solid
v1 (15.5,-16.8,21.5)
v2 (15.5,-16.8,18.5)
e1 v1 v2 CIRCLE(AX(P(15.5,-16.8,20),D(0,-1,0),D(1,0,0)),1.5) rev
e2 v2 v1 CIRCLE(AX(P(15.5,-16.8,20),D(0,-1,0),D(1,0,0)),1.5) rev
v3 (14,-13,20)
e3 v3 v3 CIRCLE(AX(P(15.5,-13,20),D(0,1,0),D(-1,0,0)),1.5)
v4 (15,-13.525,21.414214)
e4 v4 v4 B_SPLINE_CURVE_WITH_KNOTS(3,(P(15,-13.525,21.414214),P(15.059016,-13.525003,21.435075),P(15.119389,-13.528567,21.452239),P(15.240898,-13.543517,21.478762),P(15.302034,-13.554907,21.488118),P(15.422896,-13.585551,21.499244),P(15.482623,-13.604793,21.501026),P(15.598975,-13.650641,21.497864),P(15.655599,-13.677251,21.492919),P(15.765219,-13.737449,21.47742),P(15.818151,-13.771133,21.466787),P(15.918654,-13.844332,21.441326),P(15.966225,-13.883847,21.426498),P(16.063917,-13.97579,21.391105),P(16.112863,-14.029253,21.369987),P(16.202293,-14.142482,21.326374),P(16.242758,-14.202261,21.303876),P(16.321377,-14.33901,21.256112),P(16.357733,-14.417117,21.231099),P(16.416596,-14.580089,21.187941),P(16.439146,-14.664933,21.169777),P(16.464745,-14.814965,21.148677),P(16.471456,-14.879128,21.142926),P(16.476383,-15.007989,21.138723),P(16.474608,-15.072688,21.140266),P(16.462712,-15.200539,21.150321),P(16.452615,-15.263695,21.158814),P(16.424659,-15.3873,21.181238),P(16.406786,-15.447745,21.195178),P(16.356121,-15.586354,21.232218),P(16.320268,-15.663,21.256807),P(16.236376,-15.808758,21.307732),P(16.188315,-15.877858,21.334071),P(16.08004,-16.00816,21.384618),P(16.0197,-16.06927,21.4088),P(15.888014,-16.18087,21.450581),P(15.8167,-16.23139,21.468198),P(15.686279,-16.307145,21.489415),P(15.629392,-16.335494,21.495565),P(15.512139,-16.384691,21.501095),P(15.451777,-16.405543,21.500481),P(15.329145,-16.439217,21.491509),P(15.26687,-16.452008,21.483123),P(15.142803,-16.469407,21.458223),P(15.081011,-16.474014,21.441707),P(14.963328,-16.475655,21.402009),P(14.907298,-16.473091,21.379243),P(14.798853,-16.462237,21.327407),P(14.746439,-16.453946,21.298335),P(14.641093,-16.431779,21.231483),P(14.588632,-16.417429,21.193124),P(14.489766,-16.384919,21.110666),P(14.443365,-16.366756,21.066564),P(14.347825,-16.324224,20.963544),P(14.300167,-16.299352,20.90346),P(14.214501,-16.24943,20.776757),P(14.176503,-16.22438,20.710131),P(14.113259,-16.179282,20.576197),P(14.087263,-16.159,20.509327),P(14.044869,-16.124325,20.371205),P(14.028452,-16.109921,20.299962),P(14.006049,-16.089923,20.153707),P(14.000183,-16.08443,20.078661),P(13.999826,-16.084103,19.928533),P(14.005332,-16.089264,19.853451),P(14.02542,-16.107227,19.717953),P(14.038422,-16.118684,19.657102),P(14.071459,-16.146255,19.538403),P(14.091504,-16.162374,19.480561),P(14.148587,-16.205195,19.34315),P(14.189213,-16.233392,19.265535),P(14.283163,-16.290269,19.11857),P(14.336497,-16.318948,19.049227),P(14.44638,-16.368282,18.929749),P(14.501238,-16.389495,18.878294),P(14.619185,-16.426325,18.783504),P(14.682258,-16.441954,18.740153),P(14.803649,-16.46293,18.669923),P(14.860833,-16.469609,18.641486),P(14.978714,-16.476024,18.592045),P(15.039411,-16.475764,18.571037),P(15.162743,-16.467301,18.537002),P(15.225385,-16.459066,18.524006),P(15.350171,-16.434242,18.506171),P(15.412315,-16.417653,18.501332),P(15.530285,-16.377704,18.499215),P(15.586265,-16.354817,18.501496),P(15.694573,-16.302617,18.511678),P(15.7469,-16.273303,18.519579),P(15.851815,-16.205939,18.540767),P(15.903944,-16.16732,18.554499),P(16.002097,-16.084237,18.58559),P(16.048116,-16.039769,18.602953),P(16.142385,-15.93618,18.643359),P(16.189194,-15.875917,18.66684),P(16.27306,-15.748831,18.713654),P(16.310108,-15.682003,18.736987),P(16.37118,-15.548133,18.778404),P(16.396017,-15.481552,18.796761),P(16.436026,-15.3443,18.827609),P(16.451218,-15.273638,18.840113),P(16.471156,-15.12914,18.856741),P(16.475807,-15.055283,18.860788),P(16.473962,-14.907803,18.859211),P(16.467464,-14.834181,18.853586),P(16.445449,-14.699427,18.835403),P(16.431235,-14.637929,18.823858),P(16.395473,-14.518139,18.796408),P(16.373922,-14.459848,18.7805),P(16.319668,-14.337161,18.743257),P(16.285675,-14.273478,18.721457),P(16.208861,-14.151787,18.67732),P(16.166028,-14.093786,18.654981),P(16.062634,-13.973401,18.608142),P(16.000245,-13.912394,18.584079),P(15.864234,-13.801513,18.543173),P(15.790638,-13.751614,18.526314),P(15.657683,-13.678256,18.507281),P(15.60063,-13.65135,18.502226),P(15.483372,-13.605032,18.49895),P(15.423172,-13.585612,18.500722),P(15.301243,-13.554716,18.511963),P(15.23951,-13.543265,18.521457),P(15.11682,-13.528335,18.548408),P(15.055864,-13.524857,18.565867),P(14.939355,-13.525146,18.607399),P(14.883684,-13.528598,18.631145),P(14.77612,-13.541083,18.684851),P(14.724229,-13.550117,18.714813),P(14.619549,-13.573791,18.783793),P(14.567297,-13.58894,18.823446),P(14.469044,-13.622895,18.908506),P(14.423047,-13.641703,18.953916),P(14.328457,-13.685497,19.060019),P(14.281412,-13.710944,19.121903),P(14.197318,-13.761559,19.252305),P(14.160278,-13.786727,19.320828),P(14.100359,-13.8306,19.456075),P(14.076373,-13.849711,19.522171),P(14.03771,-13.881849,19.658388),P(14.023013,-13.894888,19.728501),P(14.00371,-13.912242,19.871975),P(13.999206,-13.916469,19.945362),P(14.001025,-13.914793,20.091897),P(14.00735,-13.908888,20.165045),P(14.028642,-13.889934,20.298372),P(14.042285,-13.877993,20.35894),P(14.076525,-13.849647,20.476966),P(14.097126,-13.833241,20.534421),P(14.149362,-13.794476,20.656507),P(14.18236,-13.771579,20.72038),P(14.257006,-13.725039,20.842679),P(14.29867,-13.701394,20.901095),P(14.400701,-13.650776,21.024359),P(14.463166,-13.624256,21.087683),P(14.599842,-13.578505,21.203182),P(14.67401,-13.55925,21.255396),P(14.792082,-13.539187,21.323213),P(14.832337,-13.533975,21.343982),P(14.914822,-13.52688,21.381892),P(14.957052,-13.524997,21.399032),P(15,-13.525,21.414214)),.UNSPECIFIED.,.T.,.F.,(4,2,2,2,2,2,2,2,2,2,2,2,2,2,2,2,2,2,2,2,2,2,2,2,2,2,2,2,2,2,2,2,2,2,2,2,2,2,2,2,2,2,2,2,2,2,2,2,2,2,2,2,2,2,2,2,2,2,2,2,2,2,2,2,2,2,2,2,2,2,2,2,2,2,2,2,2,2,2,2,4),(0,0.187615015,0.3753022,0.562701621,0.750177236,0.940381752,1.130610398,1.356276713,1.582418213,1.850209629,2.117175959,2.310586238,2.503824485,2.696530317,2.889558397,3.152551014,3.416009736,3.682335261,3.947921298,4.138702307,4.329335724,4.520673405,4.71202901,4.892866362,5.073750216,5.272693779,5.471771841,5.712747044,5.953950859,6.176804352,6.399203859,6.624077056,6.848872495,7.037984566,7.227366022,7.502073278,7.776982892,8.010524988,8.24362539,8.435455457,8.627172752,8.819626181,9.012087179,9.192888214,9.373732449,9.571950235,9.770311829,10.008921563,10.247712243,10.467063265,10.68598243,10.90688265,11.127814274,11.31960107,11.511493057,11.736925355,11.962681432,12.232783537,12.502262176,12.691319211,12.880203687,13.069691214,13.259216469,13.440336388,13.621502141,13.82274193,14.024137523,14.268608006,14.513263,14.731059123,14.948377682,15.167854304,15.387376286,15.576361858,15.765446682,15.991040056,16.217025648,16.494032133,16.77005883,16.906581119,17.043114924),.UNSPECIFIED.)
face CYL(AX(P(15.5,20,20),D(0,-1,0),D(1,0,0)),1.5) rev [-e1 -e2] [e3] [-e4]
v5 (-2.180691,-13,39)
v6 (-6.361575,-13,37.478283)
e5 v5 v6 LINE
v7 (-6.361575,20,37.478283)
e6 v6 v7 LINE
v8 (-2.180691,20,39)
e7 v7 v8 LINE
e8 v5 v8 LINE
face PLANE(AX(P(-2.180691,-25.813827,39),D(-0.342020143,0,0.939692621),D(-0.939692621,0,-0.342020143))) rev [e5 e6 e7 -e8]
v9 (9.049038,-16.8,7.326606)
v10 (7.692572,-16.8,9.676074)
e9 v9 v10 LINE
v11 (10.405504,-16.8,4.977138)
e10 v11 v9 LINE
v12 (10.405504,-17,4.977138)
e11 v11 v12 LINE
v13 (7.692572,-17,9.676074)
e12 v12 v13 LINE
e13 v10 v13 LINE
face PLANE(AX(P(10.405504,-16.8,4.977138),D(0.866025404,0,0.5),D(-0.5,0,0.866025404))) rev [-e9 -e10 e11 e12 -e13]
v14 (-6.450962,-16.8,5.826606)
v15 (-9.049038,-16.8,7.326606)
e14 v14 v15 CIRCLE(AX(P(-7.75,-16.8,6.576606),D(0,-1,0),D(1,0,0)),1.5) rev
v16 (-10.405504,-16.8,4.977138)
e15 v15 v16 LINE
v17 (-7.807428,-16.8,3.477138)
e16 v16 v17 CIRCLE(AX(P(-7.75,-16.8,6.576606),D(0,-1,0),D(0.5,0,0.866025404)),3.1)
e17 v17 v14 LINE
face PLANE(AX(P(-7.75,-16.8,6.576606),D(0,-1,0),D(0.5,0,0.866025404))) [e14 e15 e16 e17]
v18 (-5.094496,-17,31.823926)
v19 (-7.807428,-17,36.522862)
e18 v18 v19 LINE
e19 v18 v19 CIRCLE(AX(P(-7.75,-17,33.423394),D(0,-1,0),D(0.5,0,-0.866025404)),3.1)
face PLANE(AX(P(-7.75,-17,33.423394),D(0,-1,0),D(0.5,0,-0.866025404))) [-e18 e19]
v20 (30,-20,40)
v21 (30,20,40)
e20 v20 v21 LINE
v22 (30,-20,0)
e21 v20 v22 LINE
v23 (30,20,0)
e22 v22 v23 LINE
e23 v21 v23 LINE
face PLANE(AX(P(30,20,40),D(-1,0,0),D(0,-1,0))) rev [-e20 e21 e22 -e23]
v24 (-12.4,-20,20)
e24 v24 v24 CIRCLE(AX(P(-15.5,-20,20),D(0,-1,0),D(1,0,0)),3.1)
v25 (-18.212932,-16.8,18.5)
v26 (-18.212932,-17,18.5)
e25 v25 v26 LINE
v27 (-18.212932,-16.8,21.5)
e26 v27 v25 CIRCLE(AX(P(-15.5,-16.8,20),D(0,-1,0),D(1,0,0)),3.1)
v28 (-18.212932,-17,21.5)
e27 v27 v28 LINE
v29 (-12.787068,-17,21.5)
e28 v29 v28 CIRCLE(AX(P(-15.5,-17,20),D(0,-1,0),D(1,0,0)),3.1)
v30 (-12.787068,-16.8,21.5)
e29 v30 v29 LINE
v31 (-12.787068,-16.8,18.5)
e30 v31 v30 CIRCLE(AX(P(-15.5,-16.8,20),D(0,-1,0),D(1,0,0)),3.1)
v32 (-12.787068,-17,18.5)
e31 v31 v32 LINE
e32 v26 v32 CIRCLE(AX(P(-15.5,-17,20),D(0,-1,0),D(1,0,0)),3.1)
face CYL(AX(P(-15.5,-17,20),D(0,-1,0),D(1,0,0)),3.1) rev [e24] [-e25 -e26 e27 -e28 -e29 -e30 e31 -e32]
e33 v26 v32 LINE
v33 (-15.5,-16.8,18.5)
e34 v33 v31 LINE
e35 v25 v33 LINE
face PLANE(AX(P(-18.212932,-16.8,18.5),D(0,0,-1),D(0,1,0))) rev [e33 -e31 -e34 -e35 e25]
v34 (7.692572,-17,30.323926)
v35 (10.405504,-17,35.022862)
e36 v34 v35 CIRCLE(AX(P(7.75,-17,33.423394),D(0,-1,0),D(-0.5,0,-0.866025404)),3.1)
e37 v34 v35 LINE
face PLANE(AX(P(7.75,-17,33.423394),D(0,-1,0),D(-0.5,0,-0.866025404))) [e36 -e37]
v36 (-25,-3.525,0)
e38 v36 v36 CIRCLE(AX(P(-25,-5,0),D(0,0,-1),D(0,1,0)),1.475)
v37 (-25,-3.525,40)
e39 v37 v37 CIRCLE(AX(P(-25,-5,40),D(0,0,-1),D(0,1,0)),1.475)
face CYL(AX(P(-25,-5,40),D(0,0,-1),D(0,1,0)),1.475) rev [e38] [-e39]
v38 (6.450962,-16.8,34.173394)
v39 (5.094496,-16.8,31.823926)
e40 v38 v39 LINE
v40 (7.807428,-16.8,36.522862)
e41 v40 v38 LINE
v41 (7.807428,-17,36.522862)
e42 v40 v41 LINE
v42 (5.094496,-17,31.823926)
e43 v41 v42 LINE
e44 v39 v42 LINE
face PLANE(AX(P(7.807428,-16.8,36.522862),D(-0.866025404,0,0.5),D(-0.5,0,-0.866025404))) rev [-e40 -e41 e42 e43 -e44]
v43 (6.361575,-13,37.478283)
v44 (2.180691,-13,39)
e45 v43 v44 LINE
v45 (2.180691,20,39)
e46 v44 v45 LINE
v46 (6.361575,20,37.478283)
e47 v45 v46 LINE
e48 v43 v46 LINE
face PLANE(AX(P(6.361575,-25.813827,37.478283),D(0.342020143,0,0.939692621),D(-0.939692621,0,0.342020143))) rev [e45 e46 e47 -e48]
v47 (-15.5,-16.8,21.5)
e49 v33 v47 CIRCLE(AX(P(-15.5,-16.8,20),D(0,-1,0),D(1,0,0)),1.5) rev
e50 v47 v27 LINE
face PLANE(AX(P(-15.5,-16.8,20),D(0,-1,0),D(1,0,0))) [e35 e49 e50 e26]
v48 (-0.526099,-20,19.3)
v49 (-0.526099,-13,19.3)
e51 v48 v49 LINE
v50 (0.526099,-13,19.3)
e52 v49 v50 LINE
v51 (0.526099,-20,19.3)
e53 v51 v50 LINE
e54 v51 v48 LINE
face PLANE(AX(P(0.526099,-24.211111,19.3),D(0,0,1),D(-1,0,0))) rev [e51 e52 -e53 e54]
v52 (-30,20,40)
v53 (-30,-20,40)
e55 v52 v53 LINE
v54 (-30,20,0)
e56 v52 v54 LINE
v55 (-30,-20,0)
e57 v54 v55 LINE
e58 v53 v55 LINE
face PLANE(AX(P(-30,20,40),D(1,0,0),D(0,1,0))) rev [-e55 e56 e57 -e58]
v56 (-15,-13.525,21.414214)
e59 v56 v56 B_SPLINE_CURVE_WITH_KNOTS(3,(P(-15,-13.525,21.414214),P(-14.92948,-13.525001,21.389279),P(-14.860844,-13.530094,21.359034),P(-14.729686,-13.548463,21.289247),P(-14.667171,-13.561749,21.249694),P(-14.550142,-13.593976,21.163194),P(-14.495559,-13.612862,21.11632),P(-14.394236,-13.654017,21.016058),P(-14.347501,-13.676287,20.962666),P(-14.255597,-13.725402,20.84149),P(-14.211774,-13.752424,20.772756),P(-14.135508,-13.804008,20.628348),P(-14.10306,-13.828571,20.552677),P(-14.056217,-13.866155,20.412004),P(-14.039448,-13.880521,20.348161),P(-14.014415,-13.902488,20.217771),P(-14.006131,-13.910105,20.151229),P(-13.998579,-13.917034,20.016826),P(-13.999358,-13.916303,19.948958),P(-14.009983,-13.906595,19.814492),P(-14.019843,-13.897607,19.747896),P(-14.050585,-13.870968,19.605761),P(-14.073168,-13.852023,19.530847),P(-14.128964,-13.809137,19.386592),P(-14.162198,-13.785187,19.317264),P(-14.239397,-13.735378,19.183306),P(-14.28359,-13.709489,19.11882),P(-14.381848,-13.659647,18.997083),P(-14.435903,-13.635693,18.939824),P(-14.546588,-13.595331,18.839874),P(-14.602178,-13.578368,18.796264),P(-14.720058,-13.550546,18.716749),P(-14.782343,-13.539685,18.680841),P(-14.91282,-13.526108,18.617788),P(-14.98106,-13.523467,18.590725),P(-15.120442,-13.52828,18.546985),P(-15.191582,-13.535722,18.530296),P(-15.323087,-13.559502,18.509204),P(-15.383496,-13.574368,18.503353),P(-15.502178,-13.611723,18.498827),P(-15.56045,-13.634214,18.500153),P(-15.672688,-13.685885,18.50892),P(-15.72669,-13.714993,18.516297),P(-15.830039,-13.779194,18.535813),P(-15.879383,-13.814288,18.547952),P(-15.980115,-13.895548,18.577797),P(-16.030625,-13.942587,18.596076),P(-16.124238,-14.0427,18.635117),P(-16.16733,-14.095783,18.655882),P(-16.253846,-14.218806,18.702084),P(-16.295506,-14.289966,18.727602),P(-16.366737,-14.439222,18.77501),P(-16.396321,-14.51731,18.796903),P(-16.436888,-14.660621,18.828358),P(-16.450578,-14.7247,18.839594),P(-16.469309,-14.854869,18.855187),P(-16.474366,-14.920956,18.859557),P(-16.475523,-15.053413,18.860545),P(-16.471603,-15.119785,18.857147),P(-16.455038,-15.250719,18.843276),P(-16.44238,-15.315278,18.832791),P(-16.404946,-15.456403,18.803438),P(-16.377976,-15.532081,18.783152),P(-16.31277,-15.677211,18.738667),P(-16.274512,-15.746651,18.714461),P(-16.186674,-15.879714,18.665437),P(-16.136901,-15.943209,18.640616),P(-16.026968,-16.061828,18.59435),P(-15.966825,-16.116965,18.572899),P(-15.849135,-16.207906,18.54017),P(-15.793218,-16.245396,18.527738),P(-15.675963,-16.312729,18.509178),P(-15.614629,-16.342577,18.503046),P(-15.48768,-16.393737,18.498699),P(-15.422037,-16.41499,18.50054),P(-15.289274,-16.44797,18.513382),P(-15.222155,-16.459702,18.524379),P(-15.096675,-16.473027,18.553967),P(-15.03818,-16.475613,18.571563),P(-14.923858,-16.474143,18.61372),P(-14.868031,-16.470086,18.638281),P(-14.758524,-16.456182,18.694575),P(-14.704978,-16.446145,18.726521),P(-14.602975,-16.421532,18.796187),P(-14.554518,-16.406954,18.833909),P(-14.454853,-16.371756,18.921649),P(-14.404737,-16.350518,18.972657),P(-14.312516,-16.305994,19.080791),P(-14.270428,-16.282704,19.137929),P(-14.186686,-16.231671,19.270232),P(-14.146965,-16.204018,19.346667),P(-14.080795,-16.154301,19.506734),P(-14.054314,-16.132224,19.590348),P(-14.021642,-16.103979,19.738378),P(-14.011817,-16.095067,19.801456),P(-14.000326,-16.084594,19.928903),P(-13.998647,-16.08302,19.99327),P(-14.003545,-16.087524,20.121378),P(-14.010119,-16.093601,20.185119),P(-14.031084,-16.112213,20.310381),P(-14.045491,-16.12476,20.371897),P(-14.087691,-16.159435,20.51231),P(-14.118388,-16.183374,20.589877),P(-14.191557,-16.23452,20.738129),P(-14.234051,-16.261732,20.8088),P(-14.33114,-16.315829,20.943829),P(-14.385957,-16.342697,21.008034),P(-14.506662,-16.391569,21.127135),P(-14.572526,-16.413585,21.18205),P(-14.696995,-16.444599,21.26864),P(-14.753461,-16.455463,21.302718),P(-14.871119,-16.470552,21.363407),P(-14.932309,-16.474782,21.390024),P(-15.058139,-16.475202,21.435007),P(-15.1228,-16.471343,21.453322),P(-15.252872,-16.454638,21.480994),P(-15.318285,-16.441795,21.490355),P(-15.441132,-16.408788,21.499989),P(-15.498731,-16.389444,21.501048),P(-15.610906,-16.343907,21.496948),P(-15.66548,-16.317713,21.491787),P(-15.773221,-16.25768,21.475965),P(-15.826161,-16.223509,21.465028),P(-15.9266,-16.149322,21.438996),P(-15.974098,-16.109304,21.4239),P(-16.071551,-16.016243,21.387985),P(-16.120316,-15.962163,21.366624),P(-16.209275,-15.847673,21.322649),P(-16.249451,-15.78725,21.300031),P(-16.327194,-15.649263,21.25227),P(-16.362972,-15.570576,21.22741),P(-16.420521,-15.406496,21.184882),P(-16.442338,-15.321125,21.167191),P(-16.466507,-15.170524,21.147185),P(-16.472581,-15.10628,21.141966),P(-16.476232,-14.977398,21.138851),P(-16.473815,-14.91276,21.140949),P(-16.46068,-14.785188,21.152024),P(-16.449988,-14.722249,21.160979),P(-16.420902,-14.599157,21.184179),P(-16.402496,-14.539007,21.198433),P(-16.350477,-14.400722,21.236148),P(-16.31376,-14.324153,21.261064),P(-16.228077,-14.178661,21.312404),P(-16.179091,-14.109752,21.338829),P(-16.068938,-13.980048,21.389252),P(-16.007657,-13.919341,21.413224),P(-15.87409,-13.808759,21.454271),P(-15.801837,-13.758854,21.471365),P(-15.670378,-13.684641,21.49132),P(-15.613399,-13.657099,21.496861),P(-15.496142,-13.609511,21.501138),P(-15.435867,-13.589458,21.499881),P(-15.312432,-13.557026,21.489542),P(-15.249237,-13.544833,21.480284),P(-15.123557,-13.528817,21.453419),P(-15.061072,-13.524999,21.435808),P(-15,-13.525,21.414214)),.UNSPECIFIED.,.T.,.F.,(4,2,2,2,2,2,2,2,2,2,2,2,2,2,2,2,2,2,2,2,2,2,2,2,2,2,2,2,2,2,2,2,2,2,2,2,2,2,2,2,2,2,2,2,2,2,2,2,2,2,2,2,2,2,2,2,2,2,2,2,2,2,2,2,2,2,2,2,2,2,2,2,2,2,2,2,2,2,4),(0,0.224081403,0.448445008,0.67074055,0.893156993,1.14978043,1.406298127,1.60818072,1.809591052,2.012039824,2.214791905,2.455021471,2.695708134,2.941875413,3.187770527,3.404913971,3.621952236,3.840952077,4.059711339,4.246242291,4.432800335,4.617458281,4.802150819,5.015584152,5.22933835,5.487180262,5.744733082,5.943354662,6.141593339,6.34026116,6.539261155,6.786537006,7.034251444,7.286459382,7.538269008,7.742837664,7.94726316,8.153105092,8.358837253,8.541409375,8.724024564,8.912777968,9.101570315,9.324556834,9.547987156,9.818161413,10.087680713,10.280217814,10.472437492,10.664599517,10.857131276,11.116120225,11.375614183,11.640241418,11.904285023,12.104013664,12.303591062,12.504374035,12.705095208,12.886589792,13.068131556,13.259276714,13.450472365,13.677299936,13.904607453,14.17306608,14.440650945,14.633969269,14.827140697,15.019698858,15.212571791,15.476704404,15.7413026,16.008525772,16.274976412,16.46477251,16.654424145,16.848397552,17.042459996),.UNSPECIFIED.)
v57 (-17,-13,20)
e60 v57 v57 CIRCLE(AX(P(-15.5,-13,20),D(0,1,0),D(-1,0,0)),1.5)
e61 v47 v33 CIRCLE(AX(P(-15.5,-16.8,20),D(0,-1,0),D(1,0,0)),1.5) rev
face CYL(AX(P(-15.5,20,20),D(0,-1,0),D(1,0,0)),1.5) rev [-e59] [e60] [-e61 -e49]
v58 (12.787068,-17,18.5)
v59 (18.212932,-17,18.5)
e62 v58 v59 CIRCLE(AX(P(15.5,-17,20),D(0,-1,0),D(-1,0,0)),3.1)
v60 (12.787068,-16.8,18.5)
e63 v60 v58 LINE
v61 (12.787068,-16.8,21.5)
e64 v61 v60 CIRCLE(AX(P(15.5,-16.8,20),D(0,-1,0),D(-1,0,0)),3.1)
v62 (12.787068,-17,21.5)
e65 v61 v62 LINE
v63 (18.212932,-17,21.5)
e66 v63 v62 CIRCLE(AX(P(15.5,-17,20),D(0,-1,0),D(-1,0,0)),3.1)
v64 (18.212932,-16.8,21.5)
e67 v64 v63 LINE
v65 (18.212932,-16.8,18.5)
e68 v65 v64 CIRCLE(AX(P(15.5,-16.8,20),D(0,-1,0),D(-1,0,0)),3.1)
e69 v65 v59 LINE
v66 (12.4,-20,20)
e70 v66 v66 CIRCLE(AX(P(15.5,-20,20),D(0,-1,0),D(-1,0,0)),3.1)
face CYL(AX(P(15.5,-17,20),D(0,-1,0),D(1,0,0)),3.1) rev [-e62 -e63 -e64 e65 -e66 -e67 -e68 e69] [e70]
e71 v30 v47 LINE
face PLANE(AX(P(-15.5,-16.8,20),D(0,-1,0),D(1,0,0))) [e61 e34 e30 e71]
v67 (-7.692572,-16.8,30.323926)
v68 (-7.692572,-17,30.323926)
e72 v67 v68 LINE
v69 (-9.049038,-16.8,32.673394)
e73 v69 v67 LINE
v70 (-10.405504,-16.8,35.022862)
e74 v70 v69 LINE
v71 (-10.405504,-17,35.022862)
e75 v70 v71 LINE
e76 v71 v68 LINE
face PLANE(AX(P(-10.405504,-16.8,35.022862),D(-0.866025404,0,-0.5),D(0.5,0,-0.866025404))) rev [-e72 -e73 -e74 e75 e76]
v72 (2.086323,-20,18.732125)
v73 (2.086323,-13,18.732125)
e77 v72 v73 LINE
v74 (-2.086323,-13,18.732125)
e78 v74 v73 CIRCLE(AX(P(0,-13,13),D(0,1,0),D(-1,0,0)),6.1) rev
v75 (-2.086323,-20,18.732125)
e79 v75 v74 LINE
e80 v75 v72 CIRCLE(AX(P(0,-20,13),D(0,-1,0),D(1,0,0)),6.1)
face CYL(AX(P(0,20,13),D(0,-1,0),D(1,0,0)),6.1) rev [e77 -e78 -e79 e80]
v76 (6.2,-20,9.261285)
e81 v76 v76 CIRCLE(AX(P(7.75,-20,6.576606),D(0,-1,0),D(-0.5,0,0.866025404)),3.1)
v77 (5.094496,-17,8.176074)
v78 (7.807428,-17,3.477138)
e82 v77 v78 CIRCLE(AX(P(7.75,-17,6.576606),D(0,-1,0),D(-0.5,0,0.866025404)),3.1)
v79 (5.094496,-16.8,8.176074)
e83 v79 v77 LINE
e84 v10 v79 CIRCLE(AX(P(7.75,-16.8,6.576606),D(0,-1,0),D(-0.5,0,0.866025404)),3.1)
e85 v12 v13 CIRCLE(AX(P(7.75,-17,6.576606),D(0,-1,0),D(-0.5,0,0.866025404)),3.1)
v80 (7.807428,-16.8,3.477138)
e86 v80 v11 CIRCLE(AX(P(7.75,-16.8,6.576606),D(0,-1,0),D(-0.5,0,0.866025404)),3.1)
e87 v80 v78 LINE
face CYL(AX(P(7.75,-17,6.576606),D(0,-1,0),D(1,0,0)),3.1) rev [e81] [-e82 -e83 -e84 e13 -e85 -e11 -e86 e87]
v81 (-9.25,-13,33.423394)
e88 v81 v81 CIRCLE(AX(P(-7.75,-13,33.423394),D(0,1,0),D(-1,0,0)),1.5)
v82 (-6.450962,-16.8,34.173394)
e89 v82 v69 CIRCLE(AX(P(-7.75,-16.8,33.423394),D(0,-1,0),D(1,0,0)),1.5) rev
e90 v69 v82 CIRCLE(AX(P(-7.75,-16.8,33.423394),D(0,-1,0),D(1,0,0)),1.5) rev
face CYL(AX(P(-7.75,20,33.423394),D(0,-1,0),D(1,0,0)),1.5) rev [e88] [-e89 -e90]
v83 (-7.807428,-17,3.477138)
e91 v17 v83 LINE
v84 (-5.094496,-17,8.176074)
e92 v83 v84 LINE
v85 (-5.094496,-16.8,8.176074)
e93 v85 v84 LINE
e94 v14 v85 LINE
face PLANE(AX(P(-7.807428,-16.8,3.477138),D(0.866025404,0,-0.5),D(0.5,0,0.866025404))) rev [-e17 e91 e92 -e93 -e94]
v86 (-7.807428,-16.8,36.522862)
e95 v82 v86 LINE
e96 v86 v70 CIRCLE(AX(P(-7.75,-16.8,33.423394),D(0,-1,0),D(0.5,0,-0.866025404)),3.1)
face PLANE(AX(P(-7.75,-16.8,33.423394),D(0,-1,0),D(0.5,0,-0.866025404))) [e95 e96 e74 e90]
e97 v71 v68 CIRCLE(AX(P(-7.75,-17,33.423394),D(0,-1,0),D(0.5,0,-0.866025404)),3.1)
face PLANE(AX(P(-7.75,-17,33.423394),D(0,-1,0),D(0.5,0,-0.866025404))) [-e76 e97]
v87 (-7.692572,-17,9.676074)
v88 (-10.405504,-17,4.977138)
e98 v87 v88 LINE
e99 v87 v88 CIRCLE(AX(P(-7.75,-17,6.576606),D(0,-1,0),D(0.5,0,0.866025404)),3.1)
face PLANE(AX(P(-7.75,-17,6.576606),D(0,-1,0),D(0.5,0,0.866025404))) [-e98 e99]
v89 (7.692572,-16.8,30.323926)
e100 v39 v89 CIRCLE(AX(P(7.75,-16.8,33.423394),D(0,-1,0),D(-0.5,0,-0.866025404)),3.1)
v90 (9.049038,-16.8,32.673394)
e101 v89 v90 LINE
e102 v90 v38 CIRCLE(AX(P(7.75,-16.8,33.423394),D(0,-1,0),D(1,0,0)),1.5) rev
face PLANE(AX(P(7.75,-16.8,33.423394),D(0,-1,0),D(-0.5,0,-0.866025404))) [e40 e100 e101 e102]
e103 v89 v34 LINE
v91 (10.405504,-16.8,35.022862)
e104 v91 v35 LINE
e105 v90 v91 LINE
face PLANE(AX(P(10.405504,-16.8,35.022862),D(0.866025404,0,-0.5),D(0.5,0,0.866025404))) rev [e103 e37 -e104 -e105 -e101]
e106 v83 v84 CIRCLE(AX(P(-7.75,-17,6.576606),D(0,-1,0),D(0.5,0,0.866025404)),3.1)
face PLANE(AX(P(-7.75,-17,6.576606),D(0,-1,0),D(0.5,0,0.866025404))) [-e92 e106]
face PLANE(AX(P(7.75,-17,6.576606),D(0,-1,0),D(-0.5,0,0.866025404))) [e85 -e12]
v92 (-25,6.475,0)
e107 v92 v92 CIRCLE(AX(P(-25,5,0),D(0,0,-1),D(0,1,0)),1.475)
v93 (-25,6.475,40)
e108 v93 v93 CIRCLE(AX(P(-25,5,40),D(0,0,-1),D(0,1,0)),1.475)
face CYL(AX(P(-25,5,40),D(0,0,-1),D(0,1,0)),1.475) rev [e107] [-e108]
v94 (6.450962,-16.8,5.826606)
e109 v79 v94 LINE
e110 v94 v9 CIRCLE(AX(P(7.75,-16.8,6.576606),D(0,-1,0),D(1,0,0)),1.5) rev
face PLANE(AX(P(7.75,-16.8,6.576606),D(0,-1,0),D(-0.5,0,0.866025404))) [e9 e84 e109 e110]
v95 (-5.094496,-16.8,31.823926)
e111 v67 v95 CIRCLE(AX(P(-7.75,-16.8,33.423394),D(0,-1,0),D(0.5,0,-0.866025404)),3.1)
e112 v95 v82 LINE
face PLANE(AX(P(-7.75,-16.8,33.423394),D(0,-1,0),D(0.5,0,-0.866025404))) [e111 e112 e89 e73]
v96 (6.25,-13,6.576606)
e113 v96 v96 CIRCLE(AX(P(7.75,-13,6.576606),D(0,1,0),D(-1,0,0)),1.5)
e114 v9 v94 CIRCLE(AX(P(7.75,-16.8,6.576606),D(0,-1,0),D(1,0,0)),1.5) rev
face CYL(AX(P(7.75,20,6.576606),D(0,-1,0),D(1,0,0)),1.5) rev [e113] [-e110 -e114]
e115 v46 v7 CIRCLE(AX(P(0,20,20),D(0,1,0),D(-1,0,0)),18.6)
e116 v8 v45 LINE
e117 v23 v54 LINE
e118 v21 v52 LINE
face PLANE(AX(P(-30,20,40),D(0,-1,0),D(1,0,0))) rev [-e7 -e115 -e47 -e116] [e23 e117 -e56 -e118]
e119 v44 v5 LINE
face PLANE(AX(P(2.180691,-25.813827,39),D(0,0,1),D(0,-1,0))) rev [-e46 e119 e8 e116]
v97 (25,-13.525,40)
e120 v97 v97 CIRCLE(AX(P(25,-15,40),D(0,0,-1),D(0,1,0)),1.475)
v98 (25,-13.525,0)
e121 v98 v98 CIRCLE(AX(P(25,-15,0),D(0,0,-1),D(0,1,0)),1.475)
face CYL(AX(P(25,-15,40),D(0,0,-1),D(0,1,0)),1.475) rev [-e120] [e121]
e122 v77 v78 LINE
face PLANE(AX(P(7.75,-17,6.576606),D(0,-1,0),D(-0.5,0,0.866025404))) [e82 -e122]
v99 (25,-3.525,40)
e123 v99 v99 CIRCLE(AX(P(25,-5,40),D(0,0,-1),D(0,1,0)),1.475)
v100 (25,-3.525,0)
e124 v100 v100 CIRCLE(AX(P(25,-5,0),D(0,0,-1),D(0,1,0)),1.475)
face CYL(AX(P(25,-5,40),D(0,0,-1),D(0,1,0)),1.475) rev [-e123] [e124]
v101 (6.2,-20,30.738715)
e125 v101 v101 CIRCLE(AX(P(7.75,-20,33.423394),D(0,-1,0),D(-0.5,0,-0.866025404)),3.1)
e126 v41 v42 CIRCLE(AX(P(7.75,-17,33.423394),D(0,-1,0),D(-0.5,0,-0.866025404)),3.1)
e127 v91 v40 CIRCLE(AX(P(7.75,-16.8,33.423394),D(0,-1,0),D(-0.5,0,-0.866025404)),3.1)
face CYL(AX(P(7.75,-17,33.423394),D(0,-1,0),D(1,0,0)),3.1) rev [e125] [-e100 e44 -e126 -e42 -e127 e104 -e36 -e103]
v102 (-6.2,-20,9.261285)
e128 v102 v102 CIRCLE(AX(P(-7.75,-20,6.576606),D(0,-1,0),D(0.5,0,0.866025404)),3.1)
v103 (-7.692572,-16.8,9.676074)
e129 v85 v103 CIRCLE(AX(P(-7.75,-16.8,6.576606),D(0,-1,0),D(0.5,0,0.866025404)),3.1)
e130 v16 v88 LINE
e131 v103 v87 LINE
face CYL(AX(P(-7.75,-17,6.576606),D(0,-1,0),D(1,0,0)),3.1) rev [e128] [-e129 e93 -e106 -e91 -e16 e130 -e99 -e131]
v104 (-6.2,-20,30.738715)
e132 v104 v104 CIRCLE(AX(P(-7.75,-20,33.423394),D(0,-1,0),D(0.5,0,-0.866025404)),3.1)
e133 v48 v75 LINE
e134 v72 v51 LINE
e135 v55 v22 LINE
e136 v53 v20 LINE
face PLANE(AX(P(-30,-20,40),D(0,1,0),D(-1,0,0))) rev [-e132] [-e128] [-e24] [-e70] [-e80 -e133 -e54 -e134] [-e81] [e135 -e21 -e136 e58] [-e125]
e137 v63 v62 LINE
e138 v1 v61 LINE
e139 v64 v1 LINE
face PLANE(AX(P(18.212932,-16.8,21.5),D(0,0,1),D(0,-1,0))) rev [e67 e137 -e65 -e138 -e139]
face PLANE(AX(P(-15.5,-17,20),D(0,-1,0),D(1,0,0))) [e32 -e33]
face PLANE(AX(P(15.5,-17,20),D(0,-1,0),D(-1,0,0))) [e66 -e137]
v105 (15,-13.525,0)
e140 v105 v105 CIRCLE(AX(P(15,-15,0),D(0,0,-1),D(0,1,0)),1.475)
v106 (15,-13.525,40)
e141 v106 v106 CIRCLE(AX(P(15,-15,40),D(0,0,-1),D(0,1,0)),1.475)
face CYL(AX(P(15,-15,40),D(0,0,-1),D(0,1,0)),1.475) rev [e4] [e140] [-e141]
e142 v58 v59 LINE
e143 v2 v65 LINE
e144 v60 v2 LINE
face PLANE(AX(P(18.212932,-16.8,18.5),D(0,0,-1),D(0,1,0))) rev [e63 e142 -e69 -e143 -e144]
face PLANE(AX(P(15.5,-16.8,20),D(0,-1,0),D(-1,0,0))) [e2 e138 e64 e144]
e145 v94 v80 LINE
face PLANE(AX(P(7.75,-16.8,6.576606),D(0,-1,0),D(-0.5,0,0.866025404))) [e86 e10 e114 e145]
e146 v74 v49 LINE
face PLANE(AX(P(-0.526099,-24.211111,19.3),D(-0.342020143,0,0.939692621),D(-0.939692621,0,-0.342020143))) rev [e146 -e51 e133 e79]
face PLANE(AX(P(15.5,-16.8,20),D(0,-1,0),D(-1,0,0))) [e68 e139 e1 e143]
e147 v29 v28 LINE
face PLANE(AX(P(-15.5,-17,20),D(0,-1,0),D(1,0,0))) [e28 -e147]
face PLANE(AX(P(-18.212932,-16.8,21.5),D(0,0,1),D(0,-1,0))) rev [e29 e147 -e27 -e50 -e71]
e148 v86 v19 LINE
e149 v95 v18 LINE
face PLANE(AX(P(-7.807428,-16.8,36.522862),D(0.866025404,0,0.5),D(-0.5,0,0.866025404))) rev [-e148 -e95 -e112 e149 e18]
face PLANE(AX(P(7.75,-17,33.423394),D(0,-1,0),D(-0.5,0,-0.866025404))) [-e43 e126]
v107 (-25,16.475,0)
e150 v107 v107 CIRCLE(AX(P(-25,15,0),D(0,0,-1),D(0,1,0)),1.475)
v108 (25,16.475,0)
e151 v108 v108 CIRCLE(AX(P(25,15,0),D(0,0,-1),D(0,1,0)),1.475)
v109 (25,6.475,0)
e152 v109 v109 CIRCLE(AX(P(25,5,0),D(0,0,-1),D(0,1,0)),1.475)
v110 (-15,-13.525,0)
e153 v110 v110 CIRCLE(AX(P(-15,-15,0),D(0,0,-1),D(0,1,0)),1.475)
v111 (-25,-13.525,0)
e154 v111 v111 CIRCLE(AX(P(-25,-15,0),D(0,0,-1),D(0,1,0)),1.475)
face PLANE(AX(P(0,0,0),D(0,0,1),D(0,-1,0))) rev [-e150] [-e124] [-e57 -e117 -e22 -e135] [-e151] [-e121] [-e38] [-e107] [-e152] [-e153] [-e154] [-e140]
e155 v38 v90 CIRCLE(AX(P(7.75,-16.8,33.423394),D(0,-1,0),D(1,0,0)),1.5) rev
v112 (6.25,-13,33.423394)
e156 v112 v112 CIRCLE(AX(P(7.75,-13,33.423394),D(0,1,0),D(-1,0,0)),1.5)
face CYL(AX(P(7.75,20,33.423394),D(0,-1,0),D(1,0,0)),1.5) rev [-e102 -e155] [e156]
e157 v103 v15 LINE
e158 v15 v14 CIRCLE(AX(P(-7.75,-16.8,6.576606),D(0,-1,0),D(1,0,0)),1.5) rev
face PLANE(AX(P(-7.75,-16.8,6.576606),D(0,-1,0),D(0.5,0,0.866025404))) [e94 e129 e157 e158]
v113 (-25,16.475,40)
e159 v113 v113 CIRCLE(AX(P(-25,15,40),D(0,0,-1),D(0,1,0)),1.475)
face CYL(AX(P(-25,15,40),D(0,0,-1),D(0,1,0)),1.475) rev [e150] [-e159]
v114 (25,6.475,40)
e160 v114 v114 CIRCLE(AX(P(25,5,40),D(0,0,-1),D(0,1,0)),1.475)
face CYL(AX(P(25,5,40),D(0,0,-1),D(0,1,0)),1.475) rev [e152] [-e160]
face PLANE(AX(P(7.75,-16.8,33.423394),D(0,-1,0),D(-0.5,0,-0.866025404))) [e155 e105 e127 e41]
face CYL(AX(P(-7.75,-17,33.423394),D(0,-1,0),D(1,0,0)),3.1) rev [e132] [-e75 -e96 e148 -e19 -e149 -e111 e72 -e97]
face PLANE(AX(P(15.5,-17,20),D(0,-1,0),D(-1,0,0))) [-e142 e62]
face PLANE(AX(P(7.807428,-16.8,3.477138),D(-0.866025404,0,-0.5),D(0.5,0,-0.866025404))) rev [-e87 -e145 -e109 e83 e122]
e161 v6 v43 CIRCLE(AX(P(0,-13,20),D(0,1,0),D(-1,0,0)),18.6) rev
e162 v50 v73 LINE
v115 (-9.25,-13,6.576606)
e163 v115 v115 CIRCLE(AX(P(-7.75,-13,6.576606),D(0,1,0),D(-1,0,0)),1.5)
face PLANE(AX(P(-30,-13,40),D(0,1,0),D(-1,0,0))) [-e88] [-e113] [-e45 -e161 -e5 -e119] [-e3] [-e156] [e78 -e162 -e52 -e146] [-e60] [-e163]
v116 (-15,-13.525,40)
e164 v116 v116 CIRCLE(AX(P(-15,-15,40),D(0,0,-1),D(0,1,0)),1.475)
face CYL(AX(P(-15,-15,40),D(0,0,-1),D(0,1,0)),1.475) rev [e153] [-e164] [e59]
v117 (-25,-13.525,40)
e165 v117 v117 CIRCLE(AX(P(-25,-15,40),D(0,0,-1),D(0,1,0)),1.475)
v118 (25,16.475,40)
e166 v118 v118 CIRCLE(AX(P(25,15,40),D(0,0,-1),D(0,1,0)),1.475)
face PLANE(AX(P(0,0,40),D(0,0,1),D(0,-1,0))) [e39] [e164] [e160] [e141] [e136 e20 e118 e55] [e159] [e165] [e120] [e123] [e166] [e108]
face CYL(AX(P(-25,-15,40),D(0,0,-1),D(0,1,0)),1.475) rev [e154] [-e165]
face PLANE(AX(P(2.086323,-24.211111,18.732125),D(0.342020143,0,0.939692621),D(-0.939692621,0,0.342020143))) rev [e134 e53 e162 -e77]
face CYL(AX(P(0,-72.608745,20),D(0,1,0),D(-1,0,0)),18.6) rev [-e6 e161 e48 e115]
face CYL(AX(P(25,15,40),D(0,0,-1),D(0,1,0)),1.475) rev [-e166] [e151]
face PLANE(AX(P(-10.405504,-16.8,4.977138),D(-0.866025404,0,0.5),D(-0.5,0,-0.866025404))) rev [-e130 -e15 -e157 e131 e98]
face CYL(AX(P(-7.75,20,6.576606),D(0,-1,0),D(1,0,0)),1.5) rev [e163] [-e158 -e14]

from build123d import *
from build123d.topology import SkipClean

# Parameters (mm, degrees)
SKETCH1_W             = 60
SKETCH1_H             = 40
BOSS_EXTRUDE1_DEPTH   = 40
SKETCH2_R             = 1.475
CUT_EXTRUDE1_DEPTH    = 54.851648071
LPATTERN1_COUNT       = 6
LPATTERN1_PITCH       = 10
LPATTERN1_COUNT_DIR2  = 4
LPATTERN1_PITCH_DIR2  = 10
SKETCH4_R             = 6.1
CUT_EXTRUDE2_DEPTH    = 65.031242374
SKETCH5_R             = 18.6
CUT_EXTRUDE3_DEPTH    = 33
SKETCH6_R             = 1.5
CUT_EXTRUDE4_DEPTH    = 65.031242374
SKETCH7_R             = 3.1
CUT_EXTRUDE5_DEPTH    = 3
CUT_EXTRUDE6_DEPTH    = 0.2
CIRPATTERN1_COUNT     = 6
CUT_EXTRUDE7_DEPTH    = 33
CUT_EXTRUDE8_DEPTH    = 7
BODY_MOVE_COPY1_ANGLE = 90


with BuildPart() as part:
    # Sketch1 → Boss-Extrude1 (new body)
    with BuildSketch(Plane(origin=(0, 0, 0), x_dir=(1, 0, 0), z_dir=(0, 1, 0))):
        Rectangle(SKETCH1_W, SKETCH1_H)
    extrude(amount=BOSS_EXTRUDE1_DEPTH)

    # Sketch2 → Cut-Extrude1 (cut, through all)
    with BuildSketch(Plane.XZ):
        with Locations(Location((-25, 15, 0), (0, 0, 270))):
            Circle(SKETCH2_R)
    cut_extrude1 = extrude(amount=-CUT_EXTRUDE1_DEPTH, mode=Mode.SUBTRACT)

    # LPattern1: Cut-Extrude1 6 × 4, 14 skipped
    with Locations(*[(i * LPATTERN1_PITCH, 0, -j * LPATTERN1_PITCH_DIR2) for i in range(LPATTERN1_COUNT) for j in range(LPATTERN1_COUNT_DIR2) if (i, j) not in ((0, 0), (1, 1), (1, 2), (1, 3), (2, 0), (2, 1), (2, 2), (2, 3), (3, 0), (3, 1), (3, 2), (3, 3), (4, 1), (4, 2), (4, 3))]):
        add(cut_extrude1, mode=Mode.SUBTRACT)

    # Sketch4 → Cut-Extrude2 (cut, through all)
    with BuildSketch(Plane.XY.offset(20)):
        with Locations((0, 13)):
            Circle(SKETCH4_R)
    extrude(amount=-CUT_EXTRUDE2_DEPTH, mode=Mode.SUBTRACT)

    # Sketch5 → Cut-Extrude3 (cut)
    with BuildSketch(Plane(origin=(0, 0, -20), x_dir=(-1, 0, 0), z_dir=(0, 0, -1))):
        with Locations((0, 20)):
            Circle(SKETCH5_R)
    extrude(amount=-CUT_EXTRUDE3_DEPTH, mode=Mode.SUBTRACT)

    # Sketch6 → Cut-Extrude4 (cut, through all)
    with BuildSketch(Plane.XY.offset(20)):
        with Locations((-15.5, 20)):
            Circle(SKETCH6_R)
    cut_extrude4 = extrude(amount=-CUT_EXTRUDE4_DEPTH, mode=Mode.SUBTRACT)

    # Sketch7 → Cut-Extrude5 (cut)
    with BuildSketch(Plane.XY.offset(20)):
        with Locations((-15.5, 20)):
            Circle(SKETCH7_R)
    cut_extrude5 = extrude(amount=-CUT_EXTRUDE5_DEPTH, mode=Mode.SUBTRACT)

    # Sketch9 → Cut-Extrude6 (cut)
    with SkipClean():  # the faces are left unmerged after this step: merging them gives an invalid solid
        with BuildSketch(Plane.XY.offset(17)):
            with BuildLine():
                Line((-18.212931993, 21.5), (-12.787068007, 21.5))
                ThreePointArc((-12.787068007, 21.5), (-12.4, 20), (-12.787068007, 18.5))
                Line((-12.787068007, 18.5), (-18.212931993, 18.5))
                ThreePointArc((-18.212931993, 18.5), (-18.6, 20), (-18.212931993, 21.5))
            make_face()
        cut_extrude6 = extrude(amount=-CUT_EXTRUDE6_DEPTH, mode=Mode.SUBTRACT)

    # CirPattern1: Cut-Extrude4, Cut-Extrude5, Cut-Extrude6 ×6 about axis
    with SkipClean():  # the faces are left unmerged after this step: merging them gives an invalid solid
        cirpattern1_axis = Axis((0, 20, 0), (0, 0, 1))
        add([cut_extrude4.rotate(cirpattern1_axis, i * 360 / CIRPATTERN1_COUNT) for i in range(1, CIRPATTERN1_COUNT)], mode=Mode.SUBTRACT)
        add([cut_extrude5.rotate(cirpattern1_axis, i * 360 / CIRPATTERN1_COUNT) for i in range(1, CIRPATTERN1_COUNT)], mode=Mode.SUBTRACT)
        add([cut_extrude6.rotate(cirpattern1_axis, i * 360 / CIRPATTERN1_COUNT) for i in range(1, CIRPATTERN1_COUNT)], mode=Mode.SUBTRACT)

    # Sketch10 → Cut-Extrude7 (cut)
    with BuildSketch(Plane(origin=(0, 0, -20), x_dir=(-1, 0, 0), z_dir=(0, 0, -1))):
        Polygon((-6.361574666, 37.478282747), (-2.180690873, 39), (2.180690873, 39), (6.361574666, 37.478282747), align=None)
    extrude(amount=-CUT_EXTRUDE7_DEPTH, mode=Mode.SUBTRACT)

    # Sketch11 → Cut-Extrude8 (cut)
    with BuildSketch(Plane(origin=(0, 0, 13), x_dir=(-1, 0, 0), z_dir=(0, 0, -1))):
        Polygon((-2.086322874, 18.732124987), (-0.526099098, 19.3), (0.526099098, 19.3), (2.086322874, 18.732124987), align=None)
    extrude(amount=-CUT_EXTRUDE8_DEPTH, mode=Mode.SUBTRACT)


with BuildPart() as part_1:
    # Body-Move/Copy1: read off the stored shape, not the designer's step
    # Body-Move/Copy1: moved
    add(part.part.rotate(Axis((0, 0, 0), (1, 0, 0)), BODY_MOVE_COPY1_ANGLE))


solid = part_1.part
